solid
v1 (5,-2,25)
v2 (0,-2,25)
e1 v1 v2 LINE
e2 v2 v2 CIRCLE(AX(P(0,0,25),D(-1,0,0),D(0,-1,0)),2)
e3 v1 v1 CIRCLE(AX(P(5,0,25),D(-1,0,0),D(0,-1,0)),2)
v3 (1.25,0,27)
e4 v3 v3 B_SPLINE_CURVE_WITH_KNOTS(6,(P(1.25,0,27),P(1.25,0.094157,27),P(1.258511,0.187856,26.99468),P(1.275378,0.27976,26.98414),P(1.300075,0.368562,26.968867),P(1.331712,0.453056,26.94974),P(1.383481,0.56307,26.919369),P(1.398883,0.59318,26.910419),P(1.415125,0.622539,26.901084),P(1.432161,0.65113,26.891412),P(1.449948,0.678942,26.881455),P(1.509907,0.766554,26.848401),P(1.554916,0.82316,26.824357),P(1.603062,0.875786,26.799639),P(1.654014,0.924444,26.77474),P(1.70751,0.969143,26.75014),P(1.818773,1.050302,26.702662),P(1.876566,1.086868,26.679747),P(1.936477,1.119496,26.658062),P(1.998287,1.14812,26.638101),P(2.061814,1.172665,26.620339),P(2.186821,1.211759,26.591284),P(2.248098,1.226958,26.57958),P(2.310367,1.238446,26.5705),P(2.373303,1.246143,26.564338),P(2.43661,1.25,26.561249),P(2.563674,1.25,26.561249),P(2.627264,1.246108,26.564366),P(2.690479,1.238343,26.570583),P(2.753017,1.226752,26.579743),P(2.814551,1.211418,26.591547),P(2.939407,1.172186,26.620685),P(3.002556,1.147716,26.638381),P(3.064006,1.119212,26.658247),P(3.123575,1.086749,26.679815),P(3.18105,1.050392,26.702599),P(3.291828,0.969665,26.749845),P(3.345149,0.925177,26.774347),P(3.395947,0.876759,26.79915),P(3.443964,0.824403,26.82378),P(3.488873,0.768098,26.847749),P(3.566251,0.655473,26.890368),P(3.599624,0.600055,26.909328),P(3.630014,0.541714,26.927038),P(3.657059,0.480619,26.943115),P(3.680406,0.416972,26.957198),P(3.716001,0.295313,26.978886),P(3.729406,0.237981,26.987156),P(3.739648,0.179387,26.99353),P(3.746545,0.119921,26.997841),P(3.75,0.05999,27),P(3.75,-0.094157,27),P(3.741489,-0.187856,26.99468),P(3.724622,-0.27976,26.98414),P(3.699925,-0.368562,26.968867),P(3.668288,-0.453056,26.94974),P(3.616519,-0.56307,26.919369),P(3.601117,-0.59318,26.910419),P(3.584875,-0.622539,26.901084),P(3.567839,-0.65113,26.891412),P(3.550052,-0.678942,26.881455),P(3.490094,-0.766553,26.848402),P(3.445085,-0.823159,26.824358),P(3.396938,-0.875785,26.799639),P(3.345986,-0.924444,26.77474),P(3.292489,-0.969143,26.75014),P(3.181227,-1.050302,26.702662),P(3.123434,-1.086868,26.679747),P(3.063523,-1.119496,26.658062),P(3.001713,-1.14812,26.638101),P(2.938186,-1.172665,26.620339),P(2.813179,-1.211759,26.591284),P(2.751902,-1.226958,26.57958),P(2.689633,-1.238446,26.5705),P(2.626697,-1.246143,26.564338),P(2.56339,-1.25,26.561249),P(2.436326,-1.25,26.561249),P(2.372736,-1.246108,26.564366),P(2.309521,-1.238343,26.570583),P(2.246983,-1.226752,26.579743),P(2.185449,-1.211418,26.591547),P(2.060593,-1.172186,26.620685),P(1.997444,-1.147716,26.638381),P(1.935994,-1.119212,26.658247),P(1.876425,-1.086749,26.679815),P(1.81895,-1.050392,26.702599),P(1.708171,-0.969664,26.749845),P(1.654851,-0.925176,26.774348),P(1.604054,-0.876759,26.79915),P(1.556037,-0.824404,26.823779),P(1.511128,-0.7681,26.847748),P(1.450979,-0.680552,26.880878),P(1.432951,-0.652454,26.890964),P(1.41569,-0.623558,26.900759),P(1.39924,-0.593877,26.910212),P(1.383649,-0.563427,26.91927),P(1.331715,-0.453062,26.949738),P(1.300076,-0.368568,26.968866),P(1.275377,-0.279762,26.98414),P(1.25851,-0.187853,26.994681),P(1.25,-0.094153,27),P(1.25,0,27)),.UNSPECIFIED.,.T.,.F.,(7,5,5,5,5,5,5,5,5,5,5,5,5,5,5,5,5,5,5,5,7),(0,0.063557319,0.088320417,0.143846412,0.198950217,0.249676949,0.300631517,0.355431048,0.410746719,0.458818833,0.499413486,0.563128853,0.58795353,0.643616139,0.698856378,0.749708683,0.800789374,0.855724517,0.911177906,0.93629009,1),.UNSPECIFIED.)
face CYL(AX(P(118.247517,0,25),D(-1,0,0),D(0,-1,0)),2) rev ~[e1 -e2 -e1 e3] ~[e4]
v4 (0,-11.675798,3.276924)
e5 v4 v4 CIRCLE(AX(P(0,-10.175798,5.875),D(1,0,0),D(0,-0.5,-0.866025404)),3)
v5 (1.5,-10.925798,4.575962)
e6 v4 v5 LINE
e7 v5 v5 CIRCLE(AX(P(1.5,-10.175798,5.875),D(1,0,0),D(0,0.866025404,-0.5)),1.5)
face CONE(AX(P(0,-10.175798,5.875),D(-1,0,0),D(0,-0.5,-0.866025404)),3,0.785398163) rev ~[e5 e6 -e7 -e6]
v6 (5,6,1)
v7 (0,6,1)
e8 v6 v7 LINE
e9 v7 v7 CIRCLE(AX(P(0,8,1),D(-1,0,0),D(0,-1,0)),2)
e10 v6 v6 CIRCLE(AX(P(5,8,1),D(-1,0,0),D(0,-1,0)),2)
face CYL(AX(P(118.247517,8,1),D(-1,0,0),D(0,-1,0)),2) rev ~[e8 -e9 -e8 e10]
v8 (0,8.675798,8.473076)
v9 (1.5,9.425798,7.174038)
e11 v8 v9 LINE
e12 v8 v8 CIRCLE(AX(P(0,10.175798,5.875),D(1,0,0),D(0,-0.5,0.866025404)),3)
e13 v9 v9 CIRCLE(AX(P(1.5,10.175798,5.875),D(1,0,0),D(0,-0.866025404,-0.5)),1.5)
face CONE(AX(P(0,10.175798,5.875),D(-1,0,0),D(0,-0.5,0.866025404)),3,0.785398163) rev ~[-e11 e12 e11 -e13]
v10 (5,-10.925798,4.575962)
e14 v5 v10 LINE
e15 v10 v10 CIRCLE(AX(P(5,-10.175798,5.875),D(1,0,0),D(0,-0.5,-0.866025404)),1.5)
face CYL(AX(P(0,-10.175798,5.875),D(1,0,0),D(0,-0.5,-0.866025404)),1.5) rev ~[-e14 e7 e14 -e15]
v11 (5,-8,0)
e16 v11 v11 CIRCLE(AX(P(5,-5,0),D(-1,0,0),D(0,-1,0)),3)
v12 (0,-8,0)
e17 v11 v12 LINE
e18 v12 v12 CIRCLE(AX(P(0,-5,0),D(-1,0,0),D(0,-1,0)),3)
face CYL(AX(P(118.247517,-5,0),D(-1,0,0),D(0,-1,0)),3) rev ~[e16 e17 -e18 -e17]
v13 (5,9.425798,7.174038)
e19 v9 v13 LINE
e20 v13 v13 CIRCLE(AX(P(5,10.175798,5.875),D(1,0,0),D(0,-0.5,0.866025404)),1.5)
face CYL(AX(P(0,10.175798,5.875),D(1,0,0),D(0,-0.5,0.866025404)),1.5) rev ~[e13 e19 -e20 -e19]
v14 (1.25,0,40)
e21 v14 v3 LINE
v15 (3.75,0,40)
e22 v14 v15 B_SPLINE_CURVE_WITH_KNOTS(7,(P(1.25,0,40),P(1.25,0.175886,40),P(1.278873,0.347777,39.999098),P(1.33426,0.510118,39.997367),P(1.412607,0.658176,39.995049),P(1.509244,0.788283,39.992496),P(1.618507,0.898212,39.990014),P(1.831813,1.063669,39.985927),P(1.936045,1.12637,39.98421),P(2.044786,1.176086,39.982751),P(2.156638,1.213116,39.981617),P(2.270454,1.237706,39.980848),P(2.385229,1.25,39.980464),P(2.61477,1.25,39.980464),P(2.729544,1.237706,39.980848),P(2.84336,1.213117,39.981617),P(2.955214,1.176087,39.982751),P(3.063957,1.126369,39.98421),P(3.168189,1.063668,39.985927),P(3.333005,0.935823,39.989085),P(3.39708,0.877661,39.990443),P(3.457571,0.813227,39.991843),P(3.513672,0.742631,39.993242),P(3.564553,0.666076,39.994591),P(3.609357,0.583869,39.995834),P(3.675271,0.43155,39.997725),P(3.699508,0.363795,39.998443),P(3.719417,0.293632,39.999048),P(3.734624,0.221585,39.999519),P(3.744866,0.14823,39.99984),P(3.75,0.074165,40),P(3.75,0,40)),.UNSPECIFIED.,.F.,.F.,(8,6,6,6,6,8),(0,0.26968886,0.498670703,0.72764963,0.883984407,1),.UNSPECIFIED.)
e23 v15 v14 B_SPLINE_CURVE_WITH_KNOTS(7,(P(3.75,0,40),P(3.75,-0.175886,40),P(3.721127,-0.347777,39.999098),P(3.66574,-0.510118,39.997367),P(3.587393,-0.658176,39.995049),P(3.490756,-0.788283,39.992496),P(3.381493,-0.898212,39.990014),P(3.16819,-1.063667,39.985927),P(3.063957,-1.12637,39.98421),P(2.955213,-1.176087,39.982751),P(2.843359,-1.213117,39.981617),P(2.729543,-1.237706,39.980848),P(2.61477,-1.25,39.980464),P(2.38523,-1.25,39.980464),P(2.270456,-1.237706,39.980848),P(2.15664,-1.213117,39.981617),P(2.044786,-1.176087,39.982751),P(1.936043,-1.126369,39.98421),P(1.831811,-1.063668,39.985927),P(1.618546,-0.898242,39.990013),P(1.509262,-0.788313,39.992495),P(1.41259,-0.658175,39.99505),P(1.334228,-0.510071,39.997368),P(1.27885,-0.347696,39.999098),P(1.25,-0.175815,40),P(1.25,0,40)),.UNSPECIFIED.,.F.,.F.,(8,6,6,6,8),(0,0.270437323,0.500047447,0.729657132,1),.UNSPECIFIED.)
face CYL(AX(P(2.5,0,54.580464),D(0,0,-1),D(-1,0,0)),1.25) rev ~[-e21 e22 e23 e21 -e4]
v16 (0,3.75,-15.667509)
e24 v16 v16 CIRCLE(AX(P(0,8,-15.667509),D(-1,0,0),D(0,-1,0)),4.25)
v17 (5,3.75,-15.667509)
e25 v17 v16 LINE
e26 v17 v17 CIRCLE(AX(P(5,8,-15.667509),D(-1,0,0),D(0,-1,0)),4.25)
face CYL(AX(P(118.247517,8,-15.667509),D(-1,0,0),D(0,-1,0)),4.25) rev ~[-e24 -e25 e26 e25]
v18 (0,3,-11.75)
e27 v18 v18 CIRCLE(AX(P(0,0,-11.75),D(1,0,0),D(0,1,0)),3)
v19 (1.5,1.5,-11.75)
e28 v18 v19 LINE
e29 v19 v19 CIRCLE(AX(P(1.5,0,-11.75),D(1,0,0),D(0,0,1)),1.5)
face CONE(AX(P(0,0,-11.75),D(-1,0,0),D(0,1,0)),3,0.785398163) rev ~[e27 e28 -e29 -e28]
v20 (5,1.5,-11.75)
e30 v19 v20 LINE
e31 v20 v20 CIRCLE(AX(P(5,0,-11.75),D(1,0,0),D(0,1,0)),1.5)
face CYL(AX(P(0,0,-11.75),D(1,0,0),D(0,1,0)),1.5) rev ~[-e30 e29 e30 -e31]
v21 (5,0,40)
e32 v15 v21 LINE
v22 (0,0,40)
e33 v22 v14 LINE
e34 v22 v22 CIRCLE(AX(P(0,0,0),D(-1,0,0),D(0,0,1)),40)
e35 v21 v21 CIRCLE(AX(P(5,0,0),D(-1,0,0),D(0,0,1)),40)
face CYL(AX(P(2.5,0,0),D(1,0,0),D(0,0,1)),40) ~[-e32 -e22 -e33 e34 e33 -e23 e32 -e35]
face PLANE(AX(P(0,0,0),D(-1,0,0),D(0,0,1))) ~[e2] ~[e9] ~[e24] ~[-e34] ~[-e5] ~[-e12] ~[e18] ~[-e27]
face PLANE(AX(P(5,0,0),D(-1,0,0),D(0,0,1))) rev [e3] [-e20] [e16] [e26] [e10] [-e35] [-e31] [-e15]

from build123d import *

# Parameters (mm, degrees)
F0_W            = 5
F0_H            = 40
F3_D            = 4
F4_D            = 4
F5_D            = 6
F6_D            = 8.5
F8_D            = 3
F8_CSINK_D      = 6
F8_CSINK_ANGLE  = 90
F8_COPIES_COUNT = 3
F11_D           = 2.5
F11_DEPTH       = 14.6
F11_START       = 0.0195361
F11_TIP         = 0.7510757738


# Not quite as in the source:
# - a pattern or mirror of a feature is missing from the dataset's text; its kind, count and spacing are read off the source's solid


with BuildPart() as f1:
    # F0 (on Front) → F1 (revolve)
    with BuildSketch(Plane.XZ):
        with Locations((2.5, 20)):
            Rectangle(F0_W, F0_H)
    revolve(axis=Axis((2.5, 0, 0), (-1, 0, 0)))

    # F3 (through all)
    with Locations(Plane.YZ.offset(5)):
        with Locations((8, 1)):
            Hole(F3_D / 2)

    # F4 (through all)
    with Locations(Plane.YZ.offset(5)):
        with Locations((0, 25)):
            Hole(F4_D / 2)

    # F5 (through all)
    with Locations(Plane.YZ.offset(5)):
        with Locations((-5, 0)):
            Hole(F5_D / 2)

    # F6 (through all)
    with Locations(Plane.YZ.offset(5)):
        with Locations((8, -15.6675087226)):
            Hole(F6_D / 2)

    # F8 (through all)
    with Locations(Plane(origin=(0, 0, 0), x_dir=(0, -1, 0), z_dir=(-1, 0, 0))):
        with Locations((0, -11.75)):
            f8 = CounterSinkHole(F8_D / 2, F8_CSINK_D / 2, counter_sink_angle=F8_CSINK_ANGLE)

    # F8_copies: F8 ×3 about axis
    f8_copies_axis = Axis((0, 0, 0), (1, 0, 0))
    for i in range(1, F8_COPIES_COUNT):
        add(f8.rotate(f8_copies_axis, i * 360 / F8_COPIES_COUNT), mode=Mode.SUBTRACT)

    # F11
    # its depths count from where the whole tool has entered the part; down to there all is cleared
    with Locations(Plane.XY.offset(40).offset(-F11_START)):
        with Locations((2.5, 0)):
            Hole(F11_D / 2, depth=F11_DEPTH)
            with Locations((0, 0, -(F11_DEPTH + F11_TIP / 2))):  # 118° drill point
                Cone(0, F11_D / 2, F11_TIP, mode=Mode.SUBTRACT)


solid = f1.part
